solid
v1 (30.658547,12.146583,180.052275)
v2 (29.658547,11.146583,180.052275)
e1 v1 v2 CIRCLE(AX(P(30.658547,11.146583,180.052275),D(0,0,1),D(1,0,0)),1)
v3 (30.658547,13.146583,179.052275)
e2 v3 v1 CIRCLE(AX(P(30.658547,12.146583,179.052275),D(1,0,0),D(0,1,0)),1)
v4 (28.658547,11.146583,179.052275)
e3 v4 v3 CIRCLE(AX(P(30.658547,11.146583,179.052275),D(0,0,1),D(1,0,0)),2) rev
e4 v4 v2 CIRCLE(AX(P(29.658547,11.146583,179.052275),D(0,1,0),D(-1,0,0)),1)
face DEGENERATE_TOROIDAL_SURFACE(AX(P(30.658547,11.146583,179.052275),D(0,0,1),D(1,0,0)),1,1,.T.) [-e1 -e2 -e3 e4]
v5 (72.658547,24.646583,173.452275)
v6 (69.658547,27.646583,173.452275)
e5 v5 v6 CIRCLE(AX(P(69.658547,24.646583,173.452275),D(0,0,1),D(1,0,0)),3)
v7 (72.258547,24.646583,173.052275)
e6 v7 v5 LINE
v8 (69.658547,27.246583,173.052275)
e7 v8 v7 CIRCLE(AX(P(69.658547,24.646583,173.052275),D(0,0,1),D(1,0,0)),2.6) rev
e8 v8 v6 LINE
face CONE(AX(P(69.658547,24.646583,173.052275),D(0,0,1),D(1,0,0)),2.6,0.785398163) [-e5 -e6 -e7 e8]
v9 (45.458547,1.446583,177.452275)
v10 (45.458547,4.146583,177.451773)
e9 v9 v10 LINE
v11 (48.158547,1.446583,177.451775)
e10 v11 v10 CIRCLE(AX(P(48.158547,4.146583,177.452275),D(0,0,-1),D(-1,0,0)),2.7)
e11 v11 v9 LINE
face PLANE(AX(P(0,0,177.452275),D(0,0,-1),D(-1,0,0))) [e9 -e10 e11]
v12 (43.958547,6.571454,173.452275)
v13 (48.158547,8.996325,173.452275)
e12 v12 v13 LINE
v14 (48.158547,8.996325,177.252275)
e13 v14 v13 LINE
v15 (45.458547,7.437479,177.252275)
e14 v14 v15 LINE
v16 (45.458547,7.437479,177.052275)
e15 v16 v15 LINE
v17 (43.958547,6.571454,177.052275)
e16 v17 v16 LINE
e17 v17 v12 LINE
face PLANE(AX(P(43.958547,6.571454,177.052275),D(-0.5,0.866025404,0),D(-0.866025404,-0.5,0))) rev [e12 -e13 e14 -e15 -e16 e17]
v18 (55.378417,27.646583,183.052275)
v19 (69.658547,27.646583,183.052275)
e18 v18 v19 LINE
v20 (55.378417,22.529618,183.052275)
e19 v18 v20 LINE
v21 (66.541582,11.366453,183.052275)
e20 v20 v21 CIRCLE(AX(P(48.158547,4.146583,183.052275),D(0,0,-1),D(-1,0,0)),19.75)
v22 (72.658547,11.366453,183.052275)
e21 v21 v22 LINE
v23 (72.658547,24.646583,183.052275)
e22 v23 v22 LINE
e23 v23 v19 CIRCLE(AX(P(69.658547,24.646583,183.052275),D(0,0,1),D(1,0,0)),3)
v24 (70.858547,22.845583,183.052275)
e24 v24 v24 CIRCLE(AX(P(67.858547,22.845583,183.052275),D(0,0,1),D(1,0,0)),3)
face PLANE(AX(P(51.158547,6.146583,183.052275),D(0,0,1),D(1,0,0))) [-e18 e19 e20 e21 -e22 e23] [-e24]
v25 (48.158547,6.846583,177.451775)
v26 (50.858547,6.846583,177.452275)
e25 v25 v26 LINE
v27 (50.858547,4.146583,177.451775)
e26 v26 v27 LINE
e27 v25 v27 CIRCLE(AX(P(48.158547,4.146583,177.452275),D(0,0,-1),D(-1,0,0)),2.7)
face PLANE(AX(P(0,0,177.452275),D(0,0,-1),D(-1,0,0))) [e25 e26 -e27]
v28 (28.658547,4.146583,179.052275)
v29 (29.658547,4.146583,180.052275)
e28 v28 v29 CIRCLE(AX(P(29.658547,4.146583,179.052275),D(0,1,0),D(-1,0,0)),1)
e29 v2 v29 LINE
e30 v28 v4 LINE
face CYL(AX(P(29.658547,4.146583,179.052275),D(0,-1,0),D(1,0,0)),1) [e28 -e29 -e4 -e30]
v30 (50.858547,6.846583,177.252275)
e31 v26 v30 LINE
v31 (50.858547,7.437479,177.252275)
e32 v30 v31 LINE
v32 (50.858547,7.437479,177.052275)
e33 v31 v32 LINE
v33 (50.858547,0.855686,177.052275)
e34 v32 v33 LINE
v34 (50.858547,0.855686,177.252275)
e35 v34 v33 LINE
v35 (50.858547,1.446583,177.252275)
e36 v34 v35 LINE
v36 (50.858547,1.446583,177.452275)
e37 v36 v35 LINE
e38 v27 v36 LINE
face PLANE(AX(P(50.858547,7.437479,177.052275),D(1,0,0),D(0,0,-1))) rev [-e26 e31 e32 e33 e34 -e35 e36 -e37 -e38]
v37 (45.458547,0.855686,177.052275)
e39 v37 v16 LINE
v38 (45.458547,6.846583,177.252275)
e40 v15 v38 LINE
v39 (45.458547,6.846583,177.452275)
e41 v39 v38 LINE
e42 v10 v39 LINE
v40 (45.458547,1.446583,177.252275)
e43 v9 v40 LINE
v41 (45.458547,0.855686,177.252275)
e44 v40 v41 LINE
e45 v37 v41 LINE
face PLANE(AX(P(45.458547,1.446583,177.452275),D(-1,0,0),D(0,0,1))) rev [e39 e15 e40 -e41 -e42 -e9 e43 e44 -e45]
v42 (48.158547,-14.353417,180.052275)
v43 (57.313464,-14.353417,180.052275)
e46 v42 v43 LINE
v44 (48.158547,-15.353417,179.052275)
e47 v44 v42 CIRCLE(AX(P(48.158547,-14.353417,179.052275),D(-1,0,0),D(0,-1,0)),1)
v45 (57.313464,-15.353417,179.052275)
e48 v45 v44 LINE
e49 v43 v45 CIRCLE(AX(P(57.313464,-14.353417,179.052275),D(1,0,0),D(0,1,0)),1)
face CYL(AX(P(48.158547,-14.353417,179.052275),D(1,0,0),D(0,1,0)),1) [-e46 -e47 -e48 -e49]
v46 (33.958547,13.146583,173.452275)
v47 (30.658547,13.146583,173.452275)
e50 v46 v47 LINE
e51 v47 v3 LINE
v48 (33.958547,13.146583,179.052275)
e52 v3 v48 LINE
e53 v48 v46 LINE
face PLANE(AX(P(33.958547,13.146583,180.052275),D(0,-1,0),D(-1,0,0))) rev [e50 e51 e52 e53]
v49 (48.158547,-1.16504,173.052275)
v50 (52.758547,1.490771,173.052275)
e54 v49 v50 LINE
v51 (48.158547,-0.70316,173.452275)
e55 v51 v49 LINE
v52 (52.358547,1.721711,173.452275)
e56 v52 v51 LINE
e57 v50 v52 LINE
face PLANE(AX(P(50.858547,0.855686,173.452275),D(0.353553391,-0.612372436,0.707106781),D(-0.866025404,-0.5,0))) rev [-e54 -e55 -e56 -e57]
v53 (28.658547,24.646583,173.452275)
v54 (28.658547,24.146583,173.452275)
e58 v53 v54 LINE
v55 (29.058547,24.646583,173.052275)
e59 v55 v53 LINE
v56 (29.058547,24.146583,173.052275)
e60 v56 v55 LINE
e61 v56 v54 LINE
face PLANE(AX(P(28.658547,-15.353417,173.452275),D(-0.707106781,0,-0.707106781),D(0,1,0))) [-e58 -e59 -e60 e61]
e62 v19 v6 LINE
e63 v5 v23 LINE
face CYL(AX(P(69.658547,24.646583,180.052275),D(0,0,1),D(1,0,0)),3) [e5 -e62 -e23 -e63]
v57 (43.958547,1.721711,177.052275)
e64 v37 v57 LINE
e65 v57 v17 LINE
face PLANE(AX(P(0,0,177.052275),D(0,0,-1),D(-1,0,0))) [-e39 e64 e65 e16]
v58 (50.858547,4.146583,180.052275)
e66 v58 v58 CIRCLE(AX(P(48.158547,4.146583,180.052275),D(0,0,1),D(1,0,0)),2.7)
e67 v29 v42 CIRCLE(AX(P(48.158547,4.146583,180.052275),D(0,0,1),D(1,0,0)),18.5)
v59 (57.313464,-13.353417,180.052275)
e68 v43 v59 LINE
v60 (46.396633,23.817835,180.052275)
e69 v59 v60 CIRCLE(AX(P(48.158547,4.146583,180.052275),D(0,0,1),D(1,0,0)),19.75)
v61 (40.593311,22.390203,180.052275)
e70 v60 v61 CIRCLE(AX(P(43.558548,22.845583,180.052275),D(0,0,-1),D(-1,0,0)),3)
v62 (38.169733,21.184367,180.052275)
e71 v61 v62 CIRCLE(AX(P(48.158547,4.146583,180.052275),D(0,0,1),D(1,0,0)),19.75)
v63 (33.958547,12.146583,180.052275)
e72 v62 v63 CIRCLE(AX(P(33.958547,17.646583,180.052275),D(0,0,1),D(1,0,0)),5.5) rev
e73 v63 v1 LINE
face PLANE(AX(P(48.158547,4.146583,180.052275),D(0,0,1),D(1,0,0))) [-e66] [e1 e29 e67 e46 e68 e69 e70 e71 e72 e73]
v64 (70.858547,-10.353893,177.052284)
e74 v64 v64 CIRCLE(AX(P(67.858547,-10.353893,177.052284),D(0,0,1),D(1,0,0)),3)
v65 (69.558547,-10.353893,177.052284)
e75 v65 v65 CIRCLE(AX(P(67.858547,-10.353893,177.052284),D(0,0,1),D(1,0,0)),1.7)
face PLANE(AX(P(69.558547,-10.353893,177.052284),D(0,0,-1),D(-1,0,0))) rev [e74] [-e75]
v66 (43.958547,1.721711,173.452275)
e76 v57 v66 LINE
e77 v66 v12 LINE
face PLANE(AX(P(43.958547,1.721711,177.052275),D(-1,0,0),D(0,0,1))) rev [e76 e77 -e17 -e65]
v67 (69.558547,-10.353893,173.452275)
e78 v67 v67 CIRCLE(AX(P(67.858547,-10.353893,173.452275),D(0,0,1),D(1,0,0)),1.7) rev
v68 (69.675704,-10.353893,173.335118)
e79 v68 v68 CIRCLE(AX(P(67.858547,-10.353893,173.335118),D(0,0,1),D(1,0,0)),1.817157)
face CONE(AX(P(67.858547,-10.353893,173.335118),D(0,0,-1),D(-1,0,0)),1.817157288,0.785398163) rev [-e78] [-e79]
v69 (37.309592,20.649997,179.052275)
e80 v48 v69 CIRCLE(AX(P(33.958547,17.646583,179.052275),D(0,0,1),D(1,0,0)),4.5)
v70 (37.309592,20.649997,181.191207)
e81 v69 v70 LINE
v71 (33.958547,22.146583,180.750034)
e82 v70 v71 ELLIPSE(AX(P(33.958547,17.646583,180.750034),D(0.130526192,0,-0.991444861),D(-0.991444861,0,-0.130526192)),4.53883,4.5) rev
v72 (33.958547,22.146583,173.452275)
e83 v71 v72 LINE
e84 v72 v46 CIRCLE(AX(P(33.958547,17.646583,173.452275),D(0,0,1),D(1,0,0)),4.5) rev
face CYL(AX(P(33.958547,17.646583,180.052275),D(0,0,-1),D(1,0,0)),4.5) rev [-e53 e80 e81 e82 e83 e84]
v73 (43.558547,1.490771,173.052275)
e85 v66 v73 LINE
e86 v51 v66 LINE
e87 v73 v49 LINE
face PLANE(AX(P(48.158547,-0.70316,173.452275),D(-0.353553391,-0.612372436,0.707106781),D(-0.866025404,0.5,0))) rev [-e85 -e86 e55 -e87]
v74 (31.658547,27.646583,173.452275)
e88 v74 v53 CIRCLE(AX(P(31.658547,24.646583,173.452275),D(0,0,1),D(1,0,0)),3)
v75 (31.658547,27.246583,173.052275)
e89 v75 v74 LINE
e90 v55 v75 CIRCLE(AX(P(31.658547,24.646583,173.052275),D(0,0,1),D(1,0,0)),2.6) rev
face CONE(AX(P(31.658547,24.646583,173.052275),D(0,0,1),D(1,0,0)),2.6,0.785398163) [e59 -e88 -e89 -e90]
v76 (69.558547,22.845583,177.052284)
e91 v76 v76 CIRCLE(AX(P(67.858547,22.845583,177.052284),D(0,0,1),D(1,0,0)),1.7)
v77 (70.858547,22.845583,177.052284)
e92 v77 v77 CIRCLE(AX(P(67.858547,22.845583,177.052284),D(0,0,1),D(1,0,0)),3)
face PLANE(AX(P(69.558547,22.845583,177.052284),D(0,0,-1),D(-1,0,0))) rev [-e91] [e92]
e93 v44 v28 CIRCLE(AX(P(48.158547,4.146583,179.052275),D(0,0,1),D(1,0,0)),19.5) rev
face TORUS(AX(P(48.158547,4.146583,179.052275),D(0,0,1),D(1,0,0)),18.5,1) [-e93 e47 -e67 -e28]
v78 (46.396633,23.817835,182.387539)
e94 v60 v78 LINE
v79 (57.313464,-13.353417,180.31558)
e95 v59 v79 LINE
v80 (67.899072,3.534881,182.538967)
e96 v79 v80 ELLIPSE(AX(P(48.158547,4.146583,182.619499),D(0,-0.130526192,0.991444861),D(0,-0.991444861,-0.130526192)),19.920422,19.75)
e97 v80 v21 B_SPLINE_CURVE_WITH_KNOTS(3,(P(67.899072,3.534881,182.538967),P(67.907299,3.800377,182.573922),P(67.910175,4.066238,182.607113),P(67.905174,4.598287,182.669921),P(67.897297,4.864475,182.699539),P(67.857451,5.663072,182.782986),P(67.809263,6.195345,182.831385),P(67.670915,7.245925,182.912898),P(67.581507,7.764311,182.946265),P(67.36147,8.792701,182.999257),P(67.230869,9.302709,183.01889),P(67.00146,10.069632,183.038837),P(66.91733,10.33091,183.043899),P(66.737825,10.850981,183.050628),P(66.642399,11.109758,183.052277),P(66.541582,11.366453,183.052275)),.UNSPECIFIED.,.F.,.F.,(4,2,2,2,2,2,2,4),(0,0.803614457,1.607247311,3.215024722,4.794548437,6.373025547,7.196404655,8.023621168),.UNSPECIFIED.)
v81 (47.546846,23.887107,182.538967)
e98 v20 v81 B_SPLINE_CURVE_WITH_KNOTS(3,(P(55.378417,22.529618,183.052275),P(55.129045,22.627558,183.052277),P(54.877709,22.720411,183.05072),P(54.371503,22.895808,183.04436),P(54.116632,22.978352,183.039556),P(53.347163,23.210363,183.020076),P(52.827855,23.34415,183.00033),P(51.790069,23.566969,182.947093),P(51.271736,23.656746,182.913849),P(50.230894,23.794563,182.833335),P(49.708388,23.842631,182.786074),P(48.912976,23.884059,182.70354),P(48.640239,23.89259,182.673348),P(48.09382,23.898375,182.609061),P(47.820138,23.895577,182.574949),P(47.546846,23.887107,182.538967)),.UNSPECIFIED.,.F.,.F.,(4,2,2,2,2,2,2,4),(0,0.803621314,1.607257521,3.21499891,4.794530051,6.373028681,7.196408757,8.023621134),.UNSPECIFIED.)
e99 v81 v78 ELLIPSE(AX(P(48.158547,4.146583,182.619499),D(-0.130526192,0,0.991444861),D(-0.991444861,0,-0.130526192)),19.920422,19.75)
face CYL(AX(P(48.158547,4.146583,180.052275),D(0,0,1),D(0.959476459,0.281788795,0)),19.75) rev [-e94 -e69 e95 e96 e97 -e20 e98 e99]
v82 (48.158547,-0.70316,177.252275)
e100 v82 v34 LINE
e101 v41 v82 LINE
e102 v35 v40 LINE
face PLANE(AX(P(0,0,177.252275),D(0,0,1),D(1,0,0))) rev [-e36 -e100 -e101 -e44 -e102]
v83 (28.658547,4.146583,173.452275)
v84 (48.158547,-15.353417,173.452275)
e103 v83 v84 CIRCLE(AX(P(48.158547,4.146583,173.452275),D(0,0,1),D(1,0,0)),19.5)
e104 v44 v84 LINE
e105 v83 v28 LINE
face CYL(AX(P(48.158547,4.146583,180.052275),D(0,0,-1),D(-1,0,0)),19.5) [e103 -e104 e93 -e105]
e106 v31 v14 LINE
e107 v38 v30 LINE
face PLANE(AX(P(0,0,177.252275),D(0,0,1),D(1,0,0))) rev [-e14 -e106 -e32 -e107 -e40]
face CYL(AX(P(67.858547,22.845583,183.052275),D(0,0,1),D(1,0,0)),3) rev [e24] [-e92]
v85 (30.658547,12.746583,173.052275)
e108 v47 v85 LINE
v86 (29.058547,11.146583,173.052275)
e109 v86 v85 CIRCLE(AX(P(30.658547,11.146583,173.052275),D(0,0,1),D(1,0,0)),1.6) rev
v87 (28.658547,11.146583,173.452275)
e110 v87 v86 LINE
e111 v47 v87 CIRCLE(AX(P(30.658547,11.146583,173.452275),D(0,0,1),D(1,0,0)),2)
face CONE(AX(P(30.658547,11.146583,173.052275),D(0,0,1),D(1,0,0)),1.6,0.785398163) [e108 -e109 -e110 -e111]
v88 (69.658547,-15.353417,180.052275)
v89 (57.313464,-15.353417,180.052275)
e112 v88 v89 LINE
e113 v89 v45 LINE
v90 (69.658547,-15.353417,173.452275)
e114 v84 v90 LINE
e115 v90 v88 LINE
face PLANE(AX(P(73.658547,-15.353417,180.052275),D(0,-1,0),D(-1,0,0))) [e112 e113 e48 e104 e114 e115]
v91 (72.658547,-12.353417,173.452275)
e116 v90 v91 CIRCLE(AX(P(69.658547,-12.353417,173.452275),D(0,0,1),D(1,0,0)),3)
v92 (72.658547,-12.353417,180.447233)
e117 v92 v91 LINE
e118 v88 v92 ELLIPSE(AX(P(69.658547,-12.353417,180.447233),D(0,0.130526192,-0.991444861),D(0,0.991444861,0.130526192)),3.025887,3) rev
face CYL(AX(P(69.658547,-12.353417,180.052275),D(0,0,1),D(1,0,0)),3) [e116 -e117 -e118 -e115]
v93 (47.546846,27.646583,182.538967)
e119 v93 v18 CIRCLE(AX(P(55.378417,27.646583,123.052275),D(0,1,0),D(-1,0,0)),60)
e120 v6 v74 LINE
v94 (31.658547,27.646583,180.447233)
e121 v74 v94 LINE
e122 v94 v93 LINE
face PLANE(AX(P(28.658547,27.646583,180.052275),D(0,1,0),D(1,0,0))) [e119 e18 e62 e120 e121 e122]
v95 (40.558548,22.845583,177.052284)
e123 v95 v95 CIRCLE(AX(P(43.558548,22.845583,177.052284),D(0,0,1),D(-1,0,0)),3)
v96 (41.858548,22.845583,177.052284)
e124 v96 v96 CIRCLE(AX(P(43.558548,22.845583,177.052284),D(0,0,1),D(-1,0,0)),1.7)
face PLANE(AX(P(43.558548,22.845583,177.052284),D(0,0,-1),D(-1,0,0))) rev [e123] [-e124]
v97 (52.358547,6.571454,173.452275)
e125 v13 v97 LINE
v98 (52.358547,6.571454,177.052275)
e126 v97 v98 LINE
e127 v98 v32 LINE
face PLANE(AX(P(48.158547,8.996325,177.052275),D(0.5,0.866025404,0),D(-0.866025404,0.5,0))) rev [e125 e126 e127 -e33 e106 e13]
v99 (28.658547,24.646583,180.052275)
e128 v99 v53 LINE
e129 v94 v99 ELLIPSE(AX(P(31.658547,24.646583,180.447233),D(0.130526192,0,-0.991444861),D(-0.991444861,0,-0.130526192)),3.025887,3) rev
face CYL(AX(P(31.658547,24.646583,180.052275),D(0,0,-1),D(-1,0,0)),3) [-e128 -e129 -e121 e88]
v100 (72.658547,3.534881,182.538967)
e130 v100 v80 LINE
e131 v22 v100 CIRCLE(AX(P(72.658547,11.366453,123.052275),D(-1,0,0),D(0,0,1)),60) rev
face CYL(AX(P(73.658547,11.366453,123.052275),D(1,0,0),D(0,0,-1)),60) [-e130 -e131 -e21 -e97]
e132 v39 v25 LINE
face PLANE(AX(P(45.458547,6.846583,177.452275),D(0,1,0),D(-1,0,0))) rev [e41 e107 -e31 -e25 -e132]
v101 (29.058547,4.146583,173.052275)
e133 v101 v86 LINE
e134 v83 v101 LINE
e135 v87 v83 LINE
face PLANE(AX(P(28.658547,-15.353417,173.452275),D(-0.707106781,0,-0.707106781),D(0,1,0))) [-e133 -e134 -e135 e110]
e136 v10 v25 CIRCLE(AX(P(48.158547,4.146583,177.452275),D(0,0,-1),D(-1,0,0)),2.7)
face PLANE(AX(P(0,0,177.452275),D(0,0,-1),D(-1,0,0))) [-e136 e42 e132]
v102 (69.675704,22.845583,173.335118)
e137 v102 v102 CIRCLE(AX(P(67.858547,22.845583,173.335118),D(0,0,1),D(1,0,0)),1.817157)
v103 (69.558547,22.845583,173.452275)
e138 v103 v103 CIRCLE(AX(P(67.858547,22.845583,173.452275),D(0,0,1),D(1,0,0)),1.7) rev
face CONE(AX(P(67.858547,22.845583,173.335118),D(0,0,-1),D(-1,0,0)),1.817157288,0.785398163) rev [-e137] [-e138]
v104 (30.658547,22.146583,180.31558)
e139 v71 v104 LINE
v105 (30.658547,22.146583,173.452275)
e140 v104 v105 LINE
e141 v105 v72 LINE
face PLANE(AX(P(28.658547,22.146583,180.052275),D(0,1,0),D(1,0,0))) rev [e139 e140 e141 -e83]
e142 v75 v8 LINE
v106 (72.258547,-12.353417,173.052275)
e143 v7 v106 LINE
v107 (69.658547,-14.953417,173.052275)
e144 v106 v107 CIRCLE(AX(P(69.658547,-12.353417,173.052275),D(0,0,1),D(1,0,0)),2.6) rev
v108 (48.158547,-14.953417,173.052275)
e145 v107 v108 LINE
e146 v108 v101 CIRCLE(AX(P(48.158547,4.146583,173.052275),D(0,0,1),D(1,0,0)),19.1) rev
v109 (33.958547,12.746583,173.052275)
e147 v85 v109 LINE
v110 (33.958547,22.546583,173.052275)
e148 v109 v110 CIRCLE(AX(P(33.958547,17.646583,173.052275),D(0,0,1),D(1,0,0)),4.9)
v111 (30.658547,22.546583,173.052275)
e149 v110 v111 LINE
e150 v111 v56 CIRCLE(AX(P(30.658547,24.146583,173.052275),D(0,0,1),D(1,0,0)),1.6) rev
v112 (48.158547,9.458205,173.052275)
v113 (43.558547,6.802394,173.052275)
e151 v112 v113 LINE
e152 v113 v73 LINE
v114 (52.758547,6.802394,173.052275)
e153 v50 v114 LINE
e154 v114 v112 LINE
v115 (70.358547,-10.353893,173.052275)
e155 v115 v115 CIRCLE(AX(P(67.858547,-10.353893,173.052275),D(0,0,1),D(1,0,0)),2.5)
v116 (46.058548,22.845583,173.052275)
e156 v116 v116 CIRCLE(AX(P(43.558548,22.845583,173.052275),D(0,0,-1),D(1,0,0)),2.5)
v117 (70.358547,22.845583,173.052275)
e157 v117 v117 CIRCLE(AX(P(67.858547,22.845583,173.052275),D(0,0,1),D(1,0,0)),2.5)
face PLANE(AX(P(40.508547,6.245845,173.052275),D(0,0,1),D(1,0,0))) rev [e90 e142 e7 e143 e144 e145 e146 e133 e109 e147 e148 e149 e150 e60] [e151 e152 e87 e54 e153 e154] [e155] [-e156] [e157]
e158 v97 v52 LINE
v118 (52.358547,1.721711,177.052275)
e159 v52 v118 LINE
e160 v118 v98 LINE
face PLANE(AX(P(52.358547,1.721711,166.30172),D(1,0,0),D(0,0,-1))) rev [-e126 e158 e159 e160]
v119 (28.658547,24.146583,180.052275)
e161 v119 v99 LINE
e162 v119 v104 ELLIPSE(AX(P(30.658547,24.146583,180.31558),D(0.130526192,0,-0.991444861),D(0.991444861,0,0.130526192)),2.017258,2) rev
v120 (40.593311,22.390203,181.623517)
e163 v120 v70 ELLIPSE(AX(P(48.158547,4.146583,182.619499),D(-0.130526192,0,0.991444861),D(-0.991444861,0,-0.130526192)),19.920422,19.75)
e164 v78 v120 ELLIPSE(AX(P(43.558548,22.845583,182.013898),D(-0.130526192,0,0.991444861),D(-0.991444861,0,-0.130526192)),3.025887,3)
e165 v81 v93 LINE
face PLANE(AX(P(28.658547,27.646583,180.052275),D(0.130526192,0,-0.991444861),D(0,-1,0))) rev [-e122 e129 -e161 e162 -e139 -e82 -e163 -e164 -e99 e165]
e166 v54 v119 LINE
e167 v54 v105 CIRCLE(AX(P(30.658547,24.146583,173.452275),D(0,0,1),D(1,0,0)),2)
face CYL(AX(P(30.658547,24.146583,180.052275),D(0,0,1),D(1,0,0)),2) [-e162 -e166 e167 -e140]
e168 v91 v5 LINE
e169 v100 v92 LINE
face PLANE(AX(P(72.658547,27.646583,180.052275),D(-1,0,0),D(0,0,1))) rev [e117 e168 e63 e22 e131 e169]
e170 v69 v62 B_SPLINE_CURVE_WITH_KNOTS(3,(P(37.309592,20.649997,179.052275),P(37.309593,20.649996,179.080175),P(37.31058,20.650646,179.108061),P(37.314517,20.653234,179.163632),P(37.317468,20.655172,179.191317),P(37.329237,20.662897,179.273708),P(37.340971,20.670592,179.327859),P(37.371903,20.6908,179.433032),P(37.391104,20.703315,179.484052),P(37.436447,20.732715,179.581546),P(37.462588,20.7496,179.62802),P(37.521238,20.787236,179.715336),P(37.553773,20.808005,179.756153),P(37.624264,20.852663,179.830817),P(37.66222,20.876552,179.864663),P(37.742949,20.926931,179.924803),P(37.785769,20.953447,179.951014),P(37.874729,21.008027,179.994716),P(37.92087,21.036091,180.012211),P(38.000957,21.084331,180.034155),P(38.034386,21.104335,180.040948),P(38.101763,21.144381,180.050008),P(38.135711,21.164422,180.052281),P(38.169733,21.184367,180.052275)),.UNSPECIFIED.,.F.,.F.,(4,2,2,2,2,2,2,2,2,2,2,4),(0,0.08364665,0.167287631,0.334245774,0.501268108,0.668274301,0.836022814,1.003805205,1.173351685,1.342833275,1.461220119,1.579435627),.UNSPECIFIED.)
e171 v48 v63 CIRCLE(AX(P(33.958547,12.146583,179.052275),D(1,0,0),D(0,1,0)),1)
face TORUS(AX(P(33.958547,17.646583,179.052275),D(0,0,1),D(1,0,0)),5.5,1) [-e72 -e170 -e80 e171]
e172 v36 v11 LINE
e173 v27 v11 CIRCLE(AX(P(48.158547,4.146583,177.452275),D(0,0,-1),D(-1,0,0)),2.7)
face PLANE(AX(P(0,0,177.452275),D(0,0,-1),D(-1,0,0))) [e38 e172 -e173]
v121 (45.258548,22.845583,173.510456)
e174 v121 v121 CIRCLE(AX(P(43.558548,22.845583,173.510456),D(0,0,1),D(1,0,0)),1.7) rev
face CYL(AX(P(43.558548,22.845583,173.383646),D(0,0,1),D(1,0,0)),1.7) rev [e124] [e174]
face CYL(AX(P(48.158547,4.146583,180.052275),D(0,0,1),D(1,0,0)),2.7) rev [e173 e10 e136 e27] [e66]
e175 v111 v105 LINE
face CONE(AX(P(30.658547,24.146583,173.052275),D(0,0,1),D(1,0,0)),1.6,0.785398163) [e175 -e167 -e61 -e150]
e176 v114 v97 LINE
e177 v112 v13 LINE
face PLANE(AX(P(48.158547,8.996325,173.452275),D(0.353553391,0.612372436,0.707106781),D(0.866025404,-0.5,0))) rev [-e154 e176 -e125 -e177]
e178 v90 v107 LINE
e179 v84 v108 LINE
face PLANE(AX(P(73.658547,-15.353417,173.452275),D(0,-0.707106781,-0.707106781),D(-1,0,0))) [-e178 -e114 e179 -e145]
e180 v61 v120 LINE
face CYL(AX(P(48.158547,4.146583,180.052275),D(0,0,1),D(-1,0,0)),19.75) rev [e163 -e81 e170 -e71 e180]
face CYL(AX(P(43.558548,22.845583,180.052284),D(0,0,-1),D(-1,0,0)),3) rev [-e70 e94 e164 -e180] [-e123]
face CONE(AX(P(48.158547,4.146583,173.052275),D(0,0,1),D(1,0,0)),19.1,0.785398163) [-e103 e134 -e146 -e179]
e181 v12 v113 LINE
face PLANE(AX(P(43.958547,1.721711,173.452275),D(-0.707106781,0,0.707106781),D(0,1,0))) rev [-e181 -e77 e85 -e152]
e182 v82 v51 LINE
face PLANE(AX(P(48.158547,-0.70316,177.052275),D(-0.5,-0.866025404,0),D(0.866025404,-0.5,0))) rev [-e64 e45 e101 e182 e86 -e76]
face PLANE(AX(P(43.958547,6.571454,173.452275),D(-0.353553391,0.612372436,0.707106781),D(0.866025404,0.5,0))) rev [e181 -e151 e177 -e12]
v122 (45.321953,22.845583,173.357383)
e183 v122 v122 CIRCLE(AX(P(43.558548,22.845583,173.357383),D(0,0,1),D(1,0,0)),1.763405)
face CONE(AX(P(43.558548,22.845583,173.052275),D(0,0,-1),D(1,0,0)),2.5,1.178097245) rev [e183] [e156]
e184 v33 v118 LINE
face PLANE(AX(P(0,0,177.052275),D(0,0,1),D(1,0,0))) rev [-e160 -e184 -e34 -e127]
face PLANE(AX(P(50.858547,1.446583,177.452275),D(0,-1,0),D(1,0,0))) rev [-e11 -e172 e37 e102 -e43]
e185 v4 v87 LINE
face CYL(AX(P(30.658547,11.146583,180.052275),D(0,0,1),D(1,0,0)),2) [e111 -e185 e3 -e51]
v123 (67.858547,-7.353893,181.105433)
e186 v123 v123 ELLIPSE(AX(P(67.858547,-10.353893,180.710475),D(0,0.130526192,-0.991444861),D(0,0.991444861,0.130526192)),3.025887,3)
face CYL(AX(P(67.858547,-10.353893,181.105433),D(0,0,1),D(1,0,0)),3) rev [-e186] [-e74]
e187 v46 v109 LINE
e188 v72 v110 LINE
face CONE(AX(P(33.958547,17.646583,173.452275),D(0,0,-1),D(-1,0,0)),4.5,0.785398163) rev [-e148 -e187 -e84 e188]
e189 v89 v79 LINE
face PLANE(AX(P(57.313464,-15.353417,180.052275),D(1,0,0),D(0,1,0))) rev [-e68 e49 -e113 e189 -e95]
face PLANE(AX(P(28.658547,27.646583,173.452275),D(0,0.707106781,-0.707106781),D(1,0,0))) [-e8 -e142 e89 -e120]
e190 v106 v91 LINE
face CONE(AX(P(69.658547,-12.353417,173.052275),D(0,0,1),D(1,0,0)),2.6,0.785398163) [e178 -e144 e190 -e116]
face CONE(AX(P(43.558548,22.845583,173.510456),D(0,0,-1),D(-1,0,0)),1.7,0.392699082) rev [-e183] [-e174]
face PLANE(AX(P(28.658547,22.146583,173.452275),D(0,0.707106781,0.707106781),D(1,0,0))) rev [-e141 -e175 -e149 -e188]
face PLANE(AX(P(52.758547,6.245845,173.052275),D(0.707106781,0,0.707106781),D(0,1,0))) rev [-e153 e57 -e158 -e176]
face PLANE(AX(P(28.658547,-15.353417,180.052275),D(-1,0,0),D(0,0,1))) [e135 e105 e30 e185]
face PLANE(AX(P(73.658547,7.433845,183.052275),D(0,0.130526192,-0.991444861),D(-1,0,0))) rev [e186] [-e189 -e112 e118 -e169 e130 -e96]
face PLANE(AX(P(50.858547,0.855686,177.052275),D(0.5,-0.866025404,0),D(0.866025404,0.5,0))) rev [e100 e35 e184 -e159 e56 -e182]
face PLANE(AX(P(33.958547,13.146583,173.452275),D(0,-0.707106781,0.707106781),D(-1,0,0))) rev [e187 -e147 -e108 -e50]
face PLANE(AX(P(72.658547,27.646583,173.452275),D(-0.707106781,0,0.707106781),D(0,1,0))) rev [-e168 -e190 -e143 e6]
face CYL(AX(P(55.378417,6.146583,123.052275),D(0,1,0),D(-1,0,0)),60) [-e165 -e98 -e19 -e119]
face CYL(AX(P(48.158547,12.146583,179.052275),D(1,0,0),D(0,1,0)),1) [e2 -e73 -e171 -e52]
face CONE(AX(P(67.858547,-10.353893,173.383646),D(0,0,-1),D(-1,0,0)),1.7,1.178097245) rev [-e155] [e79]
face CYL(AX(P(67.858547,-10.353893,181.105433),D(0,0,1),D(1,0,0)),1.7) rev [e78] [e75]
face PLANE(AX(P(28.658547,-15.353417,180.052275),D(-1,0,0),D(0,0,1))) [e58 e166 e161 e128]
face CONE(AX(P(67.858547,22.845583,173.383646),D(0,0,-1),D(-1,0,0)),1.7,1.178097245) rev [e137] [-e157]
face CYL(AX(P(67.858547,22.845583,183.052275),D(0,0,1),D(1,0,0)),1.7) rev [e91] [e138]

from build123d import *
from OCP.BRepFilletAPI import BRepFilletAPI_MakeChamfer

# Parameters (mm, degrees)
CUT_EXTRUDE1_START         = -8.138931699
CUT_EXTRUDE1_DEPTH         = 7.263304995
CUT_EXTRUDE1_START_2       = -0.875626704
CUT_EXTRUDE1_2_DEPTH       = 2.736695005
CUT_EXTRUDE1_START_3       = 57.3134639
CUT_EXTRUDE1_3_DEPTH       = 15.345083288
CUT_EXTRUDE1_START_4       = -177.745546793
CUT_EXTRUDE1_4_OUTLINE_W   = 26
CUT_EXTRUDE1_4_OUTLINE_H   = 8.646582531
CUT_EXTRUDE1_4_DEPTH       = 2.974334584
CUT_EXTRUDE2_START         = -3.263295925
SKETCH2_R                  = 3
CUT_EXTRUDE2_DEPTH         = 3.263295925
CUT_EXTRUDE3_START         = -0.263304995
CUT_EXTRUDE3_DEPTH         = 0.263304995
CUT_EXTRUDE4_DEPTH         = 4
SKETCH5_W                  = 5.4
SKETCH5_H                  = 5.4
CUT_EXTRUDE5_DEPTH         = 0.4
CUT_EXTRUDE6_REACH         = 79.957
CUT_EXTRUDE7_REACH         = 79.957
CUT_EXTRUDE8_REACH         = 79.972
SKETCH12_R                 = 1.7
CUT_EXTRUDE9_DEPTH         = 3.66863822
SKETCH13_R                 = 2.5
CUT_EXTRUDE10_DEPTH        = 0.33137085
CUT_EXTRUDE10_DRAFT        = -67.5
F_5_4_5_4_DIAMETER_HOLE1_D = 5.4
FILLET1_R                  = 2
FILLET2_R                  = 3
FILLET3_R                  = 19.5
FILLET4_R                  = 60
CHAMFER1_SIZE              = 0.06862915
CHAMFER1_SIZE2             = 0.126810134
CHAMFER2_SIZE              = 0.4
FILLET6_R                  = 1


with BuildPart() as part:
    # Cut-Extrude1: read off the stored shape, not the designer's step
    # Cut-Extrude1 outline → Cut-Extrude1 (new body)
    with BuildSketch(Plane.XY.offset(181.191207123).offset(CUT_EXTRUDE1_START)):
        with BuildLine():
            Line((33.958547188, 13.146582531), (28.658547188, 13.146582531))
            Line((28.658547188, 13.146582531), (28.658547188, -15.353417469))
            Line((28.658547188, -15.353417469), (72.658547188, -15.353417469))
            Line((72.658547188, -15.353417469), (72.658547188, 27.646582531))
            Line((72.658547188, 27.646582531), (28.658547188, 27.646582531))
            Line((28.658547188, 27.646582531), (28.658547188, 22.146582531))
            Line((28.658547188, 22.146582531), (33.958547188, 22.146582531))
            ThreePointArc((33.958547188, 22.146582531), (38.458547188, 17.646582531), (33.958547188, 13.146582531))
        make_face()
    extrude(amount=CUT_EXTRUDE1_DEPTH)

    # Cut-Extrude1 2 outline → Cut-Extrude1 2 (add)
    with BuildSketch(Plane.XY.offset(181.191207123).offset(CUT_EXTRUDE1_START_2)):
        with BuildLine():
            Line((57.3134639, -13.353417469), (57.3134639, -15.353417469))
            Line((57.3134639, -15.353417469), (72.658547188, -15.353417469))
            Line((72.658547188, -15.353417469), (72.658547188, 27.646582531))
            Line((72.658547188, 27.646582531), (28.658547188, 27.646582531))
            Line((28.658547188, 27.646582531), (28.658547188, 22.146582531))
            Line((28.658547188, 22.146582531), (33.958547188, 22.146582531))
            ThreePointArc((33.958547188, 22.146582531), (35.793572578, 21.755436607), (37.309592323, 20.649996673))
            ThreePointArc((37.309592323, 20.649996673), (38.910429164, 21.597508381), (40.593311101, 22.390203415))
            ThreePointArc((40.593311101, 22.390203415), (42.841906799, 25.758729522), (46.396632901, 23.817834602))
            ThreePointArc((46.396632901, 23.817834602), (67.108207247, 9.711911241), (57.3134639, -13.353417469))
        make_face()
    extrude(amount=CUT_EXTRUDE1_2_DEPTH)

    # Cut-Extrude1 3 outline → Cut-Extrude1 3 (cut)
    with BuildSketch(Plane.YZ.offset(CUT_EXTRUDE1_START_3)):
        Polygon((-15.353417469, 183.052275424), (-15.353417469, 180.052275424), (7.433844869, 183.052275424), align=None)
    extrude(amount=CUT_EXTRUDE1_3_DEPTH, mode=Mode.SUBTRACT)

    # Cut-Extrude1 4 outline → Cut-Extrude1 4 (cut)
    with BuildSketch(Plane(origin=(0, 0, 0), x_dir=(0.9914448613737413, 0, 0.1305261922205761), z_dir=(0.13052619222057607, 0, -0.9914448613737414)).offset(CUT_EXTRUDE1_START_4)):
        with Locations((63, -23.323291265)):
            Rectangle(CUT_EXTRUDE1_4_OUTLINE_W, CUT_EXTRUDE1_4_OUTLINE_H)
    extrude(amount=CUT_EXTRUDE1_4_DEPTH, mode=Mode.SUBTRACT)

    # Sketch2 → Cut-Extrude2 (cut)
    with BuildSketch(Plane.XY.offset(180.31558042).offset(CUT_EXTRUDE2_START)):
        with Locations(Location((43.558547999, 22.845582531, 0), (0, 0, 180))):
            Circle(SKETCH2_R)
    extrude(amount=CUT_EXTRUDE2_DEPTH, mode=Mode.SUBTRACT)

    # Sketch3 → Cut-Extrude3 (cut)
    with BuildSketch(Plane.XY.offset(180.31558042).offset(CUT_EXTRUDE3_START)):
        with BuildLine():
            Line((28.658547188, -15.353417469), (57.3134639, -15.353417469))
            Line((57.3134639, -15.353417469), (57.3134639, -13.353417469))
            ThreePointArc((57.3134639, -13.353417469), (67.108207247, 9.711911241), (46.396632901, 23.817834602))
            ThreePointArc((46.396632901, 23.817834602), (44.275189199, 19.93243554), (40.593311101, 22.390203415))
            ThreePointArc((40.593311101, 22.390203415), (38.910429164, 21.597508381), (37.309592322, 20.649996673))
            ThreePointArc((37.309592322, 20.649996673), (38.067401264, 15.811557141), (33.958547188, 13.146582531))
            Line((33.958547188, 13.146582531), (28.658547188, 13.146582531))
            Line((28.658547188, 13.146582531), (28.658547188, -15.353417469))
        make_face()
    extrude(amount=CUT_EXTRUDE3_DEPTH, mode=Mode.SUBTRACT)

    # Sketch4 → Cut-Extrude4 (cut)
    with BuildSketch(Plane(origin=(0, 0, 173.052275424), x_dir=(-1, 0, 0), z_dir=(0, 0, -1))):
        Polygon((-43.958547188, 6.571453662), (-48.158547188, 8.996324792), (-50.858547188, 7.437479065), (-50.858547188, 0.855685997), (-48.158547188, -0.70315973), (-43.958547188, 1.7217114), align=None)
    extrude(amount=-CUT_EXTRUDE4_DEPTH, mode=Mode.SUBTRACT)

    # Sketch5 → Cut-Extrude5 (cut)
    with BuildSketch(Plane(origin=(0, 0, 177.052275424), x_dir=(-1, 0, 0), z_dir=(0, 0, -1))):
        with Locations((-48.158547188, 4.146582531)):
            Rectangle(SKETCH5_W, SKETCH5_H)
    extrude(amount=-CUT_EXTRUDE5_DEPTH, mode=Mode.SUBTRACT)

    # Sketch7 → Cut-Extrude6 (cut, up to next)
    with BuildSketch(Plane.XY.offset(177.252275424), mode=Mode.PRIVATE) as cut_extrude6_sk1:
        Polygon((48.158547188, 8.996324792), (45.458547188, 7.437479065), (45.458547188, 6.846582531), (50.858547188, 6.846582531), (50.858547188, 7.437479065), align=None)
    cut_extrude6_tool1 = extrude(cut_extrude6_sk1.sketch, amount=-CUT_EXTRUDE6_REACH, mode=Mode.PRIVATE) & part.part
    add(cut_extrude6_tool1.solids().sort_by_distance((48.158547, 7.60563, 177.252275))[0], mode=Mode.SUBTRACT)

    # Sketch9 → Cut-Extrude7 (cut, up to next)
    with BuildSketch(Plane.XY.offset(177.252275424), mode=Mode.PRIVATE) as cut_extrude7_sk1:
        Polygon((48.158547188, -0.70315973), (50.858547188, 0.855685997), (50.858547188, 1.446582531), (45.458547188, 1.446582531), (45.458547188, 0.855685997), align=None)
    cut_extrude7_tool1 = extrude(cut_extrude7_sk1.sketch, amount=-CUT_EXTRUDE7_REACH, mode=Mode.PRIVATE) & part.part
    add(cut_extrude7_tool1.solids().sort_by_distance((48.158547, 0.687535, 177.252275))[0], mode=Mode.SUBTRACT)

    # Sketch11 → Cut-Extrude8 (cut, up to next)
    with BuildSketch(Plane.XY.offset(177.052275424), mode=Mode.PRIVATE) as cut_extrude8_sk1:
        Polygon((50.858547188, 7.437479065), (50.858547188, 0.855685997), (52.358547188, 1.7217114), (52.358547188, 6.571453662), align=None)
    cut_extrude8_tool1 = extrude(cut_extrude8_sk1.sketch, amount=-CUT_EXTRUDE8_REACH, mode=Mode.PRIVATE) & part.part
    add(cut_extrude8_tool1.solids().sort_by_distance((51.570668, 4.146583, 177.052275))[0], mode=Mode.SUBTRACT)

    # Sketch12 → Cut-Extrude9 (cut)
    with BuildSketch(Plane.XY.offset(177.052284495)):
        with Locations(Location((43.558547999, 22.845582531, 0), (0, 0, 180))):
            Circle(SKETCH12_R)
    extrude(amount=-CUT_EXTRUDE9_DEPTH, mode=Mode.SUBTRACT)


with BuildPart() as cut_extrude10_tool:
    # Sketch13 → Cut-Extrude10 (with draft: the straight prism first)
    with BuildSketch(Plane(origin=(0, 0, 173.052275424), x_dir=(-1, 0, 0), z_dir=(0, 0, -1))):
        with Locations((-43.558547999, 22.845582531)):
            Circle(SKETCH13_R)
    extrude(amount=-CUT_EXTRUDE10_DEPTH)
    # Cut-Extrude10: the draft: its side faces are tilted about the plane it starts from
    cut_extrude10_sides = [cut_extrude10_tool.faces().sort_by_distance(p)[0] for p in [
        (46.058547999, 22.845582531, 173.217960849),
    ]]
    draft(cut_extrude10_sides, Plane(origin=(0, 0, 173.052275424), x_dir=(-1, 0, 0), z_dir=(0, 0, -1)), CUT_EXTRUDE10_DRAFT)


with BuildPart() as part_1:
    add(part.part)

    # Cut-Extrude10: cut by cut_extrude10_tool
    add(cut_extrude10_tool.part, mode=Mode.SUBTRACT)

    # Ø5.4 (5.4) Diameter Hole1 (through all)
    with Locations(Plane.XY.offset(180.052275424)):
        with Locations((48.158547188, 4.146582531)):
            Hole(F_5_4_5_4_DIAMETER_HOLE1_D / 2)

    # Sketch16 → CBORE for M3 Hex Head Machine Screw1 (revolve, cut)
    with BuildSketch(Plane(origin=(67.858547188, -10.35389299, 181.105432802), x_dir=(0, -1, 0), z_dir=(1, 0, 0))):
        Polygon((0, 0), (0, 8.053157377), (2.5, 8.053157377), (1.7, 7.721786527), (1.7, 4.053148307), (3, 4.053148307), (3, 0), align=None)
    revolve(axis=Axis((67.858547188, -10.35389299, 187.455432802), (0, 0, -1)), mode=Mode.SUBTRACT)

    # Sketch18 → CBORE for M3 Hex Head Machine Screw2 (revolve, cut)
    with BuildSketch(Plane(origin=(67.858547188, 22.845582531, 183.052275424), x_dir=(0, -1, 0), z_dir=(1, 0, 0))):
        Polygon((0, 0), (0, 10), (2.5, 10), (1.7, 9.66862915), (1.7, 5.99999093), (3, 5.99999093), (3, 0), align=None)
    revolve(axis=Axis((67.858547188, 22.845582531, 189.402275424), (0, 0, -1)), mode=Mode.SUBTRACT)

    # Fillet1
    fillet1_edges = [part_1.edges().sort_by_distance(p)[0] for p in [
        (28.658547188, 22.146582531, 176.552275424),
        (28.658547188, 13.146582531, 176.552275424),
    ]]
    fillet(fillet1_edges, radius=FILLET1_R)

    # Fillet2
    fillet2_edges = [part_1.edges().sort_by_distance(p)[0] for p in [
        (72.658547188, 27.646582531, 178.052275424),
        (72.658547188, -15.353417469, 176.552275424),
        (28.658547188, 27.646582531, 176.552275424),
    ]]
    fillet(fillet2_edges, radius=FILLET2_R)

    # Fillet3
    fillet3_edges = [part_1.edges().sort_by_distance(p)[0] for p in [
        (28.658547188, -15.353417469, 176.552275424),
    ]]
    fillet(fillet3_edges, radius=FILLET3_R)

    # Fillet4
    fillet4_edges = [part_1.edges().sort_by_distance(p)[0] for p in [
        (70.145800475, 7.433844869, 183.052275424),
        (51.445809525, 25.633835818, 183.052275424),
    ]]
    fillet(fillet4_edges, radius=FILLET4_R)

    # Chamfer1: one chamfer whose edges measure the first distance from different faces: ONE call of the kernel's chamfer builder (chamfer() names one face for all edges)
    chamfer1_edges_1 = [part_1.edges().sort_by_distance(p)[0] for p in [
        (45.258547999, 22.845582531, 173.383646274),
    ]]
    chamfer1_side_1 = [part_1.faces().sort_by_distance(p)[0] for p in [
        (45.658547999, 22.845582531, 173.217960849),
    ]]
    chamfer1_edges_2 = [part_1.edges().sort_by_distance(p)[0] for p in [
        (67.858547188, -8.65389299, 173.383646274),
    ]]
    chamfer1_side_2 = [part_1.faces().sort_by_distance(p)[0] for p in [
        (67.858547188, -8.65389299, 175.217965384),
    ]]
    chamfer1_edges_3 = [part_1.edges().sort_by_distance(p)[0] for p in [
        (67.858547188, 24.545582531, 173.383646274),
    ]]
    chamfer1_side_3 = [part_1.faces().sort_by_distance(p)[0] for p in [
        (67.858547188, 24.545582531, 175.217965384),
    ]]
    chamfer1 = BRepFilletAPI_MakeChamfer(part_1.part.solid().wrapped)
    for e in chamfer1_edges_1:
        chamfer1.Add(CHAMFER1_SIZE, CHAMFER1_SIZE2, e.wrapped, chamfer1_side_1[0].wrapped)  # the first distance lies on this face
    for e in chamfer1_edges_2:
        chamfer1.Add(CHAMFER1_SIZE, CHAMFER1_SIZE2, e.wrapped, chamfer1_side_2[0].wrapped)  # the first distance lies on this face
    for e in chamfer1_edges_3:
        chamfer1.Add(CHAMFER1_SIZE, CHAMFER1_SIZE2, e.wrapped, chamfer1_side_3[0].wrapped)  # the first distance lies on this face
    add(Compound.cast(chamfer1.Shape()), mode=Mode.REPLACE)

    # Chamfer2
    chamfer2_edges = [part_1.edges().sort_by_distance(p)[0] for p in [
        (32.308547188, 13.146582531, 173.052275424),
        (38.458547188, 17.646582531, 173.052275424),
        (43.958547188, 4.146582531, 173.052275424),
        (46.058547188, 7.783889227, 173.052275424),
        (49.508547188, 8.216901929, 173.052275424),
        (49.508547188, 0.076263133, 173.052275424),
        (46.058547188, 0.509275835, 173.052275424),
        (52.358547188, 4.146582531, 173.052275424),
        (32.308547188, 22.146582531, 173.052275424),
        (28.658547188, 7.646582531, 173.052275424),
        (29.244333626, 12.560796093, 173.052275424),
        (29.244333626, 22.732368969, 173.052275424),
        (50.658547188, 27.646582531, 173.052275424),
        (28.658547188, 24.396582531, 173.052275424),
        (72.658547188, 6.146582531, 173.052275424),
        (29.537226844, 26.767902875, 173.052275424),
        (71.779867531, -14.474737813, 173.052275424),
        (71.779867531, 26.767902875, 173.052275424),
        (58.908547188, -15.353417469, 173.052275424),
        (34.369964955, -9.641999702, 173.052275424),
    ]]
    chamfer(chamfer2_edges, length=CHAMFER2_SIZE)

    # Fillet6
    fillet6_edges = [part_1.edges().sort_by_distance(p)[0] for p in [
        (32.308547188, 13.146582531, 180.052275424),
        (38.067401264, 15.811557141, 180.052275424),
        (28.658547188, 7.646582531, 180.052275424),
        (29.244333626, 12.560796093, 180.052275424),
        (52.736005544, -15.353417469, 180.052275424),
        (34.369964955, -9.641999702, 180.052275424),
    ]]
    fillet(fillet6_edges, radius=FILLET6_R)


solid = part_1.part
